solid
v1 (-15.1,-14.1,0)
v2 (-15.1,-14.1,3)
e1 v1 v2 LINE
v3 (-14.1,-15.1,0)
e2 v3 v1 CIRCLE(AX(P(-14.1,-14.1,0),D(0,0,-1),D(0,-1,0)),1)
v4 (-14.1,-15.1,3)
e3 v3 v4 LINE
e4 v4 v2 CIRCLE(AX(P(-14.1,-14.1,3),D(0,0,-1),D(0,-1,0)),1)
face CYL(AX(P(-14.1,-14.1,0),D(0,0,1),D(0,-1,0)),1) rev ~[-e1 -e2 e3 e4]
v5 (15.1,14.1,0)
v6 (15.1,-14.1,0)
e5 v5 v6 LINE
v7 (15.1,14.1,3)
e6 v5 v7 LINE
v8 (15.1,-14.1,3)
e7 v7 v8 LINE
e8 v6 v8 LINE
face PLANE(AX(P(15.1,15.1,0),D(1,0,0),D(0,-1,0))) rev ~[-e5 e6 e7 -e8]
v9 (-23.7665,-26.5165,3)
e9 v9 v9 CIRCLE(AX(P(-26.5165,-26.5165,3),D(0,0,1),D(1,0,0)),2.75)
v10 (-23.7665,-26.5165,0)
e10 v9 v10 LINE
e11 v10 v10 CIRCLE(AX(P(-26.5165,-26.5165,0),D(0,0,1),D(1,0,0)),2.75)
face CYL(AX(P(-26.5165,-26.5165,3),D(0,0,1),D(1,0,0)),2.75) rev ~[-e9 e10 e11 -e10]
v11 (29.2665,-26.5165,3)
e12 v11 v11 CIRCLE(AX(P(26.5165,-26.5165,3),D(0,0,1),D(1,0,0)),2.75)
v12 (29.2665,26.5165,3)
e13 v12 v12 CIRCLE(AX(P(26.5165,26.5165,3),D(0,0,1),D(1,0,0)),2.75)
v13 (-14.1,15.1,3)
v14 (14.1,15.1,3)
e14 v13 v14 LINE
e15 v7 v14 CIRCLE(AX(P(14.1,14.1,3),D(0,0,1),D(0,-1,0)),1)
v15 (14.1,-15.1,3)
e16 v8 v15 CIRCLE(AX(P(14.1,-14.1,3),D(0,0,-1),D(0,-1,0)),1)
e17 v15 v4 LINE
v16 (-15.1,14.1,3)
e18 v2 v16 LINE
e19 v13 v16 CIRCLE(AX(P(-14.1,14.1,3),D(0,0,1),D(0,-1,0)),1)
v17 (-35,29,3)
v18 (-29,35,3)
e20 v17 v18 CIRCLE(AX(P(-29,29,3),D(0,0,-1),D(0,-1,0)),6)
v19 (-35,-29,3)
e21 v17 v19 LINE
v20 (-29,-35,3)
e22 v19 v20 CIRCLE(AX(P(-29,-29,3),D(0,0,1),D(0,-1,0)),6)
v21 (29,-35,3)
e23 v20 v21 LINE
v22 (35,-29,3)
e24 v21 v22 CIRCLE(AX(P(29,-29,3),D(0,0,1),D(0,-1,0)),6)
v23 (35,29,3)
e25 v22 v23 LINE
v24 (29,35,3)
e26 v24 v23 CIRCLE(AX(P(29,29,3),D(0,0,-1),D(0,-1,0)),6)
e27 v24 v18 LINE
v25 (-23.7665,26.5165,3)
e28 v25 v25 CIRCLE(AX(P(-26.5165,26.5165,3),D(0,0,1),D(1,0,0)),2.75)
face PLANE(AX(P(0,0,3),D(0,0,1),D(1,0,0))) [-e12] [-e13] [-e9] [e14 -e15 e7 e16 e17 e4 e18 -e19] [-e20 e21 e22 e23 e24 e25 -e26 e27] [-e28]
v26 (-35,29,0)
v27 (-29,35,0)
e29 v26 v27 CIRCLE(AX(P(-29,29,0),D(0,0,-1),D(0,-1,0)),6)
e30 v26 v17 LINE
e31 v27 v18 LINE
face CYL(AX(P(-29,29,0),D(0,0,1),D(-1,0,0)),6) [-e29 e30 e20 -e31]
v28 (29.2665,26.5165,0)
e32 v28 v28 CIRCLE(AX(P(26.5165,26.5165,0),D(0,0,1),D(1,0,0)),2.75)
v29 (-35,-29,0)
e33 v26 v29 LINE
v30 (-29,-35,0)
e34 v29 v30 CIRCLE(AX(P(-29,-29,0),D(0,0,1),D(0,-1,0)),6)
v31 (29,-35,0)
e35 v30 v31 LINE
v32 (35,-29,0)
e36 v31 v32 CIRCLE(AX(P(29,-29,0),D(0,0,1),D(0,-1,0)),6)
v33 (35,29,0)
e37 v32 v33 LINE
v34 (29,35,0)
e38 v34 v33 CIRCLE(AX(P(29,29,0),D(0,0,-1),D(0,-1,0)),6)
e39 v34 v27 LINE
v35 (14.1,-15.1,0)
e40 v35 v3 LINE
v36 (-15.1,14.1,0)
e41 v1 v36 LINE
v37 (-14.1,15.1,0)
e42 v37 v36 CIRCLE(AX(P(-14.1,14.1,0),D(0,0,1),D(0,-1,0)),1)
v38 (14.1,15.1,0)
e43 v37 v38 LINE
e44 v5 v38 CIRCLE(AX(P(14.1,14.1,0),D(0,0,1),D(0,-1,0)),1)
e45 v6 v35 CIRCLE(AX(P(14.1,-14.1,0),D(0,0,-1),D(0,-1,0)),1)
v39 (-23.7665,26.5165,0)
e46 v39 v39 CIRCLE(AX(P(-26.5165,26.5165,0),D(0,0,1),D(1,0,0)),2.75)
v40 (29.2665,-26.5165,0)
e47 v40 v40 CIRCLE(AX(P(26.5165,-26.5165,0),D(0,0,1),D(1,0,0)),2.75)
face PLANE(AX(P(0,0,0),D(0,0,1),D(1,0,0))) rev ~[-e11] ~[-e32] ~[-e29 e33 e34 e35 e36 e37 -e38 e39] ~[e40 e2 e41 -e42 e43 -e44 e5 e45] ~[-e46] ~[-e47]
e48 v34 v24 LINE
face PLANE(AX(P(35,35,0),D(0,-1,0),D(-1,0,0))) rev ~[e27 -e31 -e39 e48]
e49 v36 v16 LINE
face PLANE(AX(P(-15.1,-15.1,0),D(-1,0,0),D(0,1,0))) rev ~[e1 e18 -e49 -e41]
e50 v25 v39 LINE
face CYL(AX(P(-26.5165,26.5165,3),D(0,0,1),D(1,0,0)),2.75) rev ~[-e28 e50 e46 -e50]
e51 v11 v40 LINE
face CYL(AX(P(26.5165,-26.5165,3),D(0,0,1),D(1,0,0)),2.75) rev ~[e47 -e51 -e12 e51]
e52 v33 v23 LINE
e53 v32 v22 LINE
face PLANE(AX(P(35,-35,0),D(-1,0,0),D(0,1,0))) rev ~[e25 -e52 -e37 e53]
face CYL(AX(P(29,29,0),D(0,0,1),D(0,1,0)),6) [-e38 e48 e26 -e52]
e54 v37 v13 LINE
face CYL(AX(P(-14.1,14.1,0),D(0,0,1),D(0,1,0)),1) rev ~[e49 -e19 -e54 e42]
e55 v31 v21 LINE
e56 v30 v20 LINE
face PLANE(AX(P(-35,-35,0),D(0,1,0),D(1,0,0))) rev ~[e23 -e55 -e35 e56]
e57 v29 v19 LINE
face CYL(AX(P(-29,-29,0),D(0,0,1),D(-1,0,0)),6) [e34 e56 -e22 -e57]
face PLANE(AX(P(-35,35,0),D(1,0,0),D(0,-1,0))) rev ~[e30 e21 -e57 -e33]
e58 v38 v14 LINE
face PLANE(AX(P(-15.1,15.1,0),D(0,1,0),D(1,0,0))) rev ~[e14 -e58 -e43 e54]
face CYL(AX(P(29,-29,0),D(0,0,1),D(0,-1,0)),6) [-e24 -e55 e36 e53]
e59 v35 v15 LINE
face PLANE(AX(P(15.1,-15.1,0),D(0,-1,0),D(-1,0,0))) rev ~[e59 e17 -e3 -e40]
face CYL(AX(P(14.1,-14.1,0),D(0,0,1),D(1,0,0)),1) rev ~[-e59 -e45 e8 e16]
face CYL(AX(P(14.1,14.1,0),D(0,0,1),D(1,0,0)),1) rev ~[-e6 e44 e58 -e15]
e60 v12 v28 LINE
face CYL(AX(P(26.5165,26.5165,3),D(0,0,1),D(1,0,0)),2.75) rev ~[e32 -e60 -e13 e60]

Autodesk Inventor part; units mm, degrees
ref_plane "YZ Plane" through (0, 0, 0) normal (1, 0, 0) x (0, 1, 0)
ref_plane "XZ Plane" through (0, 0, 0) normal (0, 1, 0) x (-1, 0, 0)
ref_plane "XY Plane" through (0, 0, 0) normal (0, 0, 1) x (1, 0, 0)
sketch "Sketch1" plane through (0, 0, 0) normal (0, 0, 1) x (1, 0, 0)
  line L0 (-35, -35) -> (35, -35)
  line L1 (35, -35) -> (35, 35)
  line L2 (35, 35) -> (-35, 35)
  line L3 (-35, 35) -> (-35, -35)
  line L4 (-35, -35) -> (35, 35) construction
  line L5 (35, -35) -> (-35, 35) construction
  line L6 (15.1, -15.1) -> (-15.1, -15.1)
  line L7 (-15.1, -15.1) -> (-15.1, 15.1)
  line L8 (-15.1, 15.1) -> (15.1, 15.1)
  line L9 (15.1, 15.1) -> (15.1, -15.1)
  line L10 (15.1, -15.1) -> (-15.1, 15.1) construction
  line L11 (-15.1, -15.1) -> (15.1, 15.1) construction
  point P0 (0, 0)
  dimension "d172" = 30.2
  dimension "d181" = 19.9
  dimension "d187" = 19.9
  dimension "d189" = 70
extrude "Plate5" add sketch "Sketch1" along normal blind 3
sketch "Sketch9" plane through (0, 0, 3) normal (0, 0, 1) x (1, 0, 0)
  circle A0 centre (26.5165, -26.5165) radius 2.75
  line L0 (26.5165, 26.5165) -> (-26.5165, 26.5165) construction
  line L1 (-26.5165, 26.5165) -> (-26.5165, -26.5165) construction
  line L2 (-26.5165, -26.5165) -> (26.5165, -26.5165) construction
  line L3 (26.5165, -26.5165) -> (26.5165, 26.5165) construction
  line L4 (26.5165, 26.5165) -> (-26.5165, -26.5165) construction
  line L5 (-26.5165, 26.5165) -> (26.5165, -26.5165) construction
  circle A1 centre (-26.5165, -26.5165) radius 2.75
  circle A2 centre (26.5165, 26.5165) radius 2.75
  circle A3 centre (-26.5165, 26.5165) radius 2.75
  circle A4 centre (0, 0) radius 37.5 construction
  line L6 (-15.1, -15.1) -> (-15.1, 15.1) projected
  line L7 (-15.1, 15.1) -> (15.1, 15.1) projected
  line L8 (15.1, 15.1) -> (15.1, -15.1) projected
  line L9 (15.1, -15.1) -> (-15.1, -15.1) projected
  line L10 (35, -35) -> (-35, -35) projected
  line L11 (35, 35) -> (35, -35) projected
  line L12 (-35, 35) -> (35, 35) projected
  line L13 (-35, -35) -> (-35, 35) projected
  line L14 (-15, 15) -> (15, 15) construction
  line L15 (15, 15) -> (15, -15) construction
  line L16 (15, -15) -> (-15, -15) construction
  line L17 (-15, -15) -> (-15, 15) construction
  line L18 (-15, -15) -> (15, 15) construction
  dimension "d188" = 75
  dimension "d174" = 5.5
  dimension "d184" = 30
  dimension "d185" = 30
  dimension "d186" = 16.2868
extrude "Cut2" cut sketch "Sketch9" against normal blind 3 contours A0 | A1 | A2 | A3
fillet "Corner Round1" radius 6 4 edges at (35, 35, 1.5) (-35, 35, 1.5) (-35, -35, 1.5) (35, -35, 1.5)
fillet "Corner Round2" radius 1 4 edges at (-15.1, 15.1, 1.5) (-15.1, -15.1, 1.5) (15.1, -15.1, 1.5) (15.1, 15.1, 1.5)
properties part number "ANP 1426 FDS Way FLANGE 2" material "Stainless Steel"
